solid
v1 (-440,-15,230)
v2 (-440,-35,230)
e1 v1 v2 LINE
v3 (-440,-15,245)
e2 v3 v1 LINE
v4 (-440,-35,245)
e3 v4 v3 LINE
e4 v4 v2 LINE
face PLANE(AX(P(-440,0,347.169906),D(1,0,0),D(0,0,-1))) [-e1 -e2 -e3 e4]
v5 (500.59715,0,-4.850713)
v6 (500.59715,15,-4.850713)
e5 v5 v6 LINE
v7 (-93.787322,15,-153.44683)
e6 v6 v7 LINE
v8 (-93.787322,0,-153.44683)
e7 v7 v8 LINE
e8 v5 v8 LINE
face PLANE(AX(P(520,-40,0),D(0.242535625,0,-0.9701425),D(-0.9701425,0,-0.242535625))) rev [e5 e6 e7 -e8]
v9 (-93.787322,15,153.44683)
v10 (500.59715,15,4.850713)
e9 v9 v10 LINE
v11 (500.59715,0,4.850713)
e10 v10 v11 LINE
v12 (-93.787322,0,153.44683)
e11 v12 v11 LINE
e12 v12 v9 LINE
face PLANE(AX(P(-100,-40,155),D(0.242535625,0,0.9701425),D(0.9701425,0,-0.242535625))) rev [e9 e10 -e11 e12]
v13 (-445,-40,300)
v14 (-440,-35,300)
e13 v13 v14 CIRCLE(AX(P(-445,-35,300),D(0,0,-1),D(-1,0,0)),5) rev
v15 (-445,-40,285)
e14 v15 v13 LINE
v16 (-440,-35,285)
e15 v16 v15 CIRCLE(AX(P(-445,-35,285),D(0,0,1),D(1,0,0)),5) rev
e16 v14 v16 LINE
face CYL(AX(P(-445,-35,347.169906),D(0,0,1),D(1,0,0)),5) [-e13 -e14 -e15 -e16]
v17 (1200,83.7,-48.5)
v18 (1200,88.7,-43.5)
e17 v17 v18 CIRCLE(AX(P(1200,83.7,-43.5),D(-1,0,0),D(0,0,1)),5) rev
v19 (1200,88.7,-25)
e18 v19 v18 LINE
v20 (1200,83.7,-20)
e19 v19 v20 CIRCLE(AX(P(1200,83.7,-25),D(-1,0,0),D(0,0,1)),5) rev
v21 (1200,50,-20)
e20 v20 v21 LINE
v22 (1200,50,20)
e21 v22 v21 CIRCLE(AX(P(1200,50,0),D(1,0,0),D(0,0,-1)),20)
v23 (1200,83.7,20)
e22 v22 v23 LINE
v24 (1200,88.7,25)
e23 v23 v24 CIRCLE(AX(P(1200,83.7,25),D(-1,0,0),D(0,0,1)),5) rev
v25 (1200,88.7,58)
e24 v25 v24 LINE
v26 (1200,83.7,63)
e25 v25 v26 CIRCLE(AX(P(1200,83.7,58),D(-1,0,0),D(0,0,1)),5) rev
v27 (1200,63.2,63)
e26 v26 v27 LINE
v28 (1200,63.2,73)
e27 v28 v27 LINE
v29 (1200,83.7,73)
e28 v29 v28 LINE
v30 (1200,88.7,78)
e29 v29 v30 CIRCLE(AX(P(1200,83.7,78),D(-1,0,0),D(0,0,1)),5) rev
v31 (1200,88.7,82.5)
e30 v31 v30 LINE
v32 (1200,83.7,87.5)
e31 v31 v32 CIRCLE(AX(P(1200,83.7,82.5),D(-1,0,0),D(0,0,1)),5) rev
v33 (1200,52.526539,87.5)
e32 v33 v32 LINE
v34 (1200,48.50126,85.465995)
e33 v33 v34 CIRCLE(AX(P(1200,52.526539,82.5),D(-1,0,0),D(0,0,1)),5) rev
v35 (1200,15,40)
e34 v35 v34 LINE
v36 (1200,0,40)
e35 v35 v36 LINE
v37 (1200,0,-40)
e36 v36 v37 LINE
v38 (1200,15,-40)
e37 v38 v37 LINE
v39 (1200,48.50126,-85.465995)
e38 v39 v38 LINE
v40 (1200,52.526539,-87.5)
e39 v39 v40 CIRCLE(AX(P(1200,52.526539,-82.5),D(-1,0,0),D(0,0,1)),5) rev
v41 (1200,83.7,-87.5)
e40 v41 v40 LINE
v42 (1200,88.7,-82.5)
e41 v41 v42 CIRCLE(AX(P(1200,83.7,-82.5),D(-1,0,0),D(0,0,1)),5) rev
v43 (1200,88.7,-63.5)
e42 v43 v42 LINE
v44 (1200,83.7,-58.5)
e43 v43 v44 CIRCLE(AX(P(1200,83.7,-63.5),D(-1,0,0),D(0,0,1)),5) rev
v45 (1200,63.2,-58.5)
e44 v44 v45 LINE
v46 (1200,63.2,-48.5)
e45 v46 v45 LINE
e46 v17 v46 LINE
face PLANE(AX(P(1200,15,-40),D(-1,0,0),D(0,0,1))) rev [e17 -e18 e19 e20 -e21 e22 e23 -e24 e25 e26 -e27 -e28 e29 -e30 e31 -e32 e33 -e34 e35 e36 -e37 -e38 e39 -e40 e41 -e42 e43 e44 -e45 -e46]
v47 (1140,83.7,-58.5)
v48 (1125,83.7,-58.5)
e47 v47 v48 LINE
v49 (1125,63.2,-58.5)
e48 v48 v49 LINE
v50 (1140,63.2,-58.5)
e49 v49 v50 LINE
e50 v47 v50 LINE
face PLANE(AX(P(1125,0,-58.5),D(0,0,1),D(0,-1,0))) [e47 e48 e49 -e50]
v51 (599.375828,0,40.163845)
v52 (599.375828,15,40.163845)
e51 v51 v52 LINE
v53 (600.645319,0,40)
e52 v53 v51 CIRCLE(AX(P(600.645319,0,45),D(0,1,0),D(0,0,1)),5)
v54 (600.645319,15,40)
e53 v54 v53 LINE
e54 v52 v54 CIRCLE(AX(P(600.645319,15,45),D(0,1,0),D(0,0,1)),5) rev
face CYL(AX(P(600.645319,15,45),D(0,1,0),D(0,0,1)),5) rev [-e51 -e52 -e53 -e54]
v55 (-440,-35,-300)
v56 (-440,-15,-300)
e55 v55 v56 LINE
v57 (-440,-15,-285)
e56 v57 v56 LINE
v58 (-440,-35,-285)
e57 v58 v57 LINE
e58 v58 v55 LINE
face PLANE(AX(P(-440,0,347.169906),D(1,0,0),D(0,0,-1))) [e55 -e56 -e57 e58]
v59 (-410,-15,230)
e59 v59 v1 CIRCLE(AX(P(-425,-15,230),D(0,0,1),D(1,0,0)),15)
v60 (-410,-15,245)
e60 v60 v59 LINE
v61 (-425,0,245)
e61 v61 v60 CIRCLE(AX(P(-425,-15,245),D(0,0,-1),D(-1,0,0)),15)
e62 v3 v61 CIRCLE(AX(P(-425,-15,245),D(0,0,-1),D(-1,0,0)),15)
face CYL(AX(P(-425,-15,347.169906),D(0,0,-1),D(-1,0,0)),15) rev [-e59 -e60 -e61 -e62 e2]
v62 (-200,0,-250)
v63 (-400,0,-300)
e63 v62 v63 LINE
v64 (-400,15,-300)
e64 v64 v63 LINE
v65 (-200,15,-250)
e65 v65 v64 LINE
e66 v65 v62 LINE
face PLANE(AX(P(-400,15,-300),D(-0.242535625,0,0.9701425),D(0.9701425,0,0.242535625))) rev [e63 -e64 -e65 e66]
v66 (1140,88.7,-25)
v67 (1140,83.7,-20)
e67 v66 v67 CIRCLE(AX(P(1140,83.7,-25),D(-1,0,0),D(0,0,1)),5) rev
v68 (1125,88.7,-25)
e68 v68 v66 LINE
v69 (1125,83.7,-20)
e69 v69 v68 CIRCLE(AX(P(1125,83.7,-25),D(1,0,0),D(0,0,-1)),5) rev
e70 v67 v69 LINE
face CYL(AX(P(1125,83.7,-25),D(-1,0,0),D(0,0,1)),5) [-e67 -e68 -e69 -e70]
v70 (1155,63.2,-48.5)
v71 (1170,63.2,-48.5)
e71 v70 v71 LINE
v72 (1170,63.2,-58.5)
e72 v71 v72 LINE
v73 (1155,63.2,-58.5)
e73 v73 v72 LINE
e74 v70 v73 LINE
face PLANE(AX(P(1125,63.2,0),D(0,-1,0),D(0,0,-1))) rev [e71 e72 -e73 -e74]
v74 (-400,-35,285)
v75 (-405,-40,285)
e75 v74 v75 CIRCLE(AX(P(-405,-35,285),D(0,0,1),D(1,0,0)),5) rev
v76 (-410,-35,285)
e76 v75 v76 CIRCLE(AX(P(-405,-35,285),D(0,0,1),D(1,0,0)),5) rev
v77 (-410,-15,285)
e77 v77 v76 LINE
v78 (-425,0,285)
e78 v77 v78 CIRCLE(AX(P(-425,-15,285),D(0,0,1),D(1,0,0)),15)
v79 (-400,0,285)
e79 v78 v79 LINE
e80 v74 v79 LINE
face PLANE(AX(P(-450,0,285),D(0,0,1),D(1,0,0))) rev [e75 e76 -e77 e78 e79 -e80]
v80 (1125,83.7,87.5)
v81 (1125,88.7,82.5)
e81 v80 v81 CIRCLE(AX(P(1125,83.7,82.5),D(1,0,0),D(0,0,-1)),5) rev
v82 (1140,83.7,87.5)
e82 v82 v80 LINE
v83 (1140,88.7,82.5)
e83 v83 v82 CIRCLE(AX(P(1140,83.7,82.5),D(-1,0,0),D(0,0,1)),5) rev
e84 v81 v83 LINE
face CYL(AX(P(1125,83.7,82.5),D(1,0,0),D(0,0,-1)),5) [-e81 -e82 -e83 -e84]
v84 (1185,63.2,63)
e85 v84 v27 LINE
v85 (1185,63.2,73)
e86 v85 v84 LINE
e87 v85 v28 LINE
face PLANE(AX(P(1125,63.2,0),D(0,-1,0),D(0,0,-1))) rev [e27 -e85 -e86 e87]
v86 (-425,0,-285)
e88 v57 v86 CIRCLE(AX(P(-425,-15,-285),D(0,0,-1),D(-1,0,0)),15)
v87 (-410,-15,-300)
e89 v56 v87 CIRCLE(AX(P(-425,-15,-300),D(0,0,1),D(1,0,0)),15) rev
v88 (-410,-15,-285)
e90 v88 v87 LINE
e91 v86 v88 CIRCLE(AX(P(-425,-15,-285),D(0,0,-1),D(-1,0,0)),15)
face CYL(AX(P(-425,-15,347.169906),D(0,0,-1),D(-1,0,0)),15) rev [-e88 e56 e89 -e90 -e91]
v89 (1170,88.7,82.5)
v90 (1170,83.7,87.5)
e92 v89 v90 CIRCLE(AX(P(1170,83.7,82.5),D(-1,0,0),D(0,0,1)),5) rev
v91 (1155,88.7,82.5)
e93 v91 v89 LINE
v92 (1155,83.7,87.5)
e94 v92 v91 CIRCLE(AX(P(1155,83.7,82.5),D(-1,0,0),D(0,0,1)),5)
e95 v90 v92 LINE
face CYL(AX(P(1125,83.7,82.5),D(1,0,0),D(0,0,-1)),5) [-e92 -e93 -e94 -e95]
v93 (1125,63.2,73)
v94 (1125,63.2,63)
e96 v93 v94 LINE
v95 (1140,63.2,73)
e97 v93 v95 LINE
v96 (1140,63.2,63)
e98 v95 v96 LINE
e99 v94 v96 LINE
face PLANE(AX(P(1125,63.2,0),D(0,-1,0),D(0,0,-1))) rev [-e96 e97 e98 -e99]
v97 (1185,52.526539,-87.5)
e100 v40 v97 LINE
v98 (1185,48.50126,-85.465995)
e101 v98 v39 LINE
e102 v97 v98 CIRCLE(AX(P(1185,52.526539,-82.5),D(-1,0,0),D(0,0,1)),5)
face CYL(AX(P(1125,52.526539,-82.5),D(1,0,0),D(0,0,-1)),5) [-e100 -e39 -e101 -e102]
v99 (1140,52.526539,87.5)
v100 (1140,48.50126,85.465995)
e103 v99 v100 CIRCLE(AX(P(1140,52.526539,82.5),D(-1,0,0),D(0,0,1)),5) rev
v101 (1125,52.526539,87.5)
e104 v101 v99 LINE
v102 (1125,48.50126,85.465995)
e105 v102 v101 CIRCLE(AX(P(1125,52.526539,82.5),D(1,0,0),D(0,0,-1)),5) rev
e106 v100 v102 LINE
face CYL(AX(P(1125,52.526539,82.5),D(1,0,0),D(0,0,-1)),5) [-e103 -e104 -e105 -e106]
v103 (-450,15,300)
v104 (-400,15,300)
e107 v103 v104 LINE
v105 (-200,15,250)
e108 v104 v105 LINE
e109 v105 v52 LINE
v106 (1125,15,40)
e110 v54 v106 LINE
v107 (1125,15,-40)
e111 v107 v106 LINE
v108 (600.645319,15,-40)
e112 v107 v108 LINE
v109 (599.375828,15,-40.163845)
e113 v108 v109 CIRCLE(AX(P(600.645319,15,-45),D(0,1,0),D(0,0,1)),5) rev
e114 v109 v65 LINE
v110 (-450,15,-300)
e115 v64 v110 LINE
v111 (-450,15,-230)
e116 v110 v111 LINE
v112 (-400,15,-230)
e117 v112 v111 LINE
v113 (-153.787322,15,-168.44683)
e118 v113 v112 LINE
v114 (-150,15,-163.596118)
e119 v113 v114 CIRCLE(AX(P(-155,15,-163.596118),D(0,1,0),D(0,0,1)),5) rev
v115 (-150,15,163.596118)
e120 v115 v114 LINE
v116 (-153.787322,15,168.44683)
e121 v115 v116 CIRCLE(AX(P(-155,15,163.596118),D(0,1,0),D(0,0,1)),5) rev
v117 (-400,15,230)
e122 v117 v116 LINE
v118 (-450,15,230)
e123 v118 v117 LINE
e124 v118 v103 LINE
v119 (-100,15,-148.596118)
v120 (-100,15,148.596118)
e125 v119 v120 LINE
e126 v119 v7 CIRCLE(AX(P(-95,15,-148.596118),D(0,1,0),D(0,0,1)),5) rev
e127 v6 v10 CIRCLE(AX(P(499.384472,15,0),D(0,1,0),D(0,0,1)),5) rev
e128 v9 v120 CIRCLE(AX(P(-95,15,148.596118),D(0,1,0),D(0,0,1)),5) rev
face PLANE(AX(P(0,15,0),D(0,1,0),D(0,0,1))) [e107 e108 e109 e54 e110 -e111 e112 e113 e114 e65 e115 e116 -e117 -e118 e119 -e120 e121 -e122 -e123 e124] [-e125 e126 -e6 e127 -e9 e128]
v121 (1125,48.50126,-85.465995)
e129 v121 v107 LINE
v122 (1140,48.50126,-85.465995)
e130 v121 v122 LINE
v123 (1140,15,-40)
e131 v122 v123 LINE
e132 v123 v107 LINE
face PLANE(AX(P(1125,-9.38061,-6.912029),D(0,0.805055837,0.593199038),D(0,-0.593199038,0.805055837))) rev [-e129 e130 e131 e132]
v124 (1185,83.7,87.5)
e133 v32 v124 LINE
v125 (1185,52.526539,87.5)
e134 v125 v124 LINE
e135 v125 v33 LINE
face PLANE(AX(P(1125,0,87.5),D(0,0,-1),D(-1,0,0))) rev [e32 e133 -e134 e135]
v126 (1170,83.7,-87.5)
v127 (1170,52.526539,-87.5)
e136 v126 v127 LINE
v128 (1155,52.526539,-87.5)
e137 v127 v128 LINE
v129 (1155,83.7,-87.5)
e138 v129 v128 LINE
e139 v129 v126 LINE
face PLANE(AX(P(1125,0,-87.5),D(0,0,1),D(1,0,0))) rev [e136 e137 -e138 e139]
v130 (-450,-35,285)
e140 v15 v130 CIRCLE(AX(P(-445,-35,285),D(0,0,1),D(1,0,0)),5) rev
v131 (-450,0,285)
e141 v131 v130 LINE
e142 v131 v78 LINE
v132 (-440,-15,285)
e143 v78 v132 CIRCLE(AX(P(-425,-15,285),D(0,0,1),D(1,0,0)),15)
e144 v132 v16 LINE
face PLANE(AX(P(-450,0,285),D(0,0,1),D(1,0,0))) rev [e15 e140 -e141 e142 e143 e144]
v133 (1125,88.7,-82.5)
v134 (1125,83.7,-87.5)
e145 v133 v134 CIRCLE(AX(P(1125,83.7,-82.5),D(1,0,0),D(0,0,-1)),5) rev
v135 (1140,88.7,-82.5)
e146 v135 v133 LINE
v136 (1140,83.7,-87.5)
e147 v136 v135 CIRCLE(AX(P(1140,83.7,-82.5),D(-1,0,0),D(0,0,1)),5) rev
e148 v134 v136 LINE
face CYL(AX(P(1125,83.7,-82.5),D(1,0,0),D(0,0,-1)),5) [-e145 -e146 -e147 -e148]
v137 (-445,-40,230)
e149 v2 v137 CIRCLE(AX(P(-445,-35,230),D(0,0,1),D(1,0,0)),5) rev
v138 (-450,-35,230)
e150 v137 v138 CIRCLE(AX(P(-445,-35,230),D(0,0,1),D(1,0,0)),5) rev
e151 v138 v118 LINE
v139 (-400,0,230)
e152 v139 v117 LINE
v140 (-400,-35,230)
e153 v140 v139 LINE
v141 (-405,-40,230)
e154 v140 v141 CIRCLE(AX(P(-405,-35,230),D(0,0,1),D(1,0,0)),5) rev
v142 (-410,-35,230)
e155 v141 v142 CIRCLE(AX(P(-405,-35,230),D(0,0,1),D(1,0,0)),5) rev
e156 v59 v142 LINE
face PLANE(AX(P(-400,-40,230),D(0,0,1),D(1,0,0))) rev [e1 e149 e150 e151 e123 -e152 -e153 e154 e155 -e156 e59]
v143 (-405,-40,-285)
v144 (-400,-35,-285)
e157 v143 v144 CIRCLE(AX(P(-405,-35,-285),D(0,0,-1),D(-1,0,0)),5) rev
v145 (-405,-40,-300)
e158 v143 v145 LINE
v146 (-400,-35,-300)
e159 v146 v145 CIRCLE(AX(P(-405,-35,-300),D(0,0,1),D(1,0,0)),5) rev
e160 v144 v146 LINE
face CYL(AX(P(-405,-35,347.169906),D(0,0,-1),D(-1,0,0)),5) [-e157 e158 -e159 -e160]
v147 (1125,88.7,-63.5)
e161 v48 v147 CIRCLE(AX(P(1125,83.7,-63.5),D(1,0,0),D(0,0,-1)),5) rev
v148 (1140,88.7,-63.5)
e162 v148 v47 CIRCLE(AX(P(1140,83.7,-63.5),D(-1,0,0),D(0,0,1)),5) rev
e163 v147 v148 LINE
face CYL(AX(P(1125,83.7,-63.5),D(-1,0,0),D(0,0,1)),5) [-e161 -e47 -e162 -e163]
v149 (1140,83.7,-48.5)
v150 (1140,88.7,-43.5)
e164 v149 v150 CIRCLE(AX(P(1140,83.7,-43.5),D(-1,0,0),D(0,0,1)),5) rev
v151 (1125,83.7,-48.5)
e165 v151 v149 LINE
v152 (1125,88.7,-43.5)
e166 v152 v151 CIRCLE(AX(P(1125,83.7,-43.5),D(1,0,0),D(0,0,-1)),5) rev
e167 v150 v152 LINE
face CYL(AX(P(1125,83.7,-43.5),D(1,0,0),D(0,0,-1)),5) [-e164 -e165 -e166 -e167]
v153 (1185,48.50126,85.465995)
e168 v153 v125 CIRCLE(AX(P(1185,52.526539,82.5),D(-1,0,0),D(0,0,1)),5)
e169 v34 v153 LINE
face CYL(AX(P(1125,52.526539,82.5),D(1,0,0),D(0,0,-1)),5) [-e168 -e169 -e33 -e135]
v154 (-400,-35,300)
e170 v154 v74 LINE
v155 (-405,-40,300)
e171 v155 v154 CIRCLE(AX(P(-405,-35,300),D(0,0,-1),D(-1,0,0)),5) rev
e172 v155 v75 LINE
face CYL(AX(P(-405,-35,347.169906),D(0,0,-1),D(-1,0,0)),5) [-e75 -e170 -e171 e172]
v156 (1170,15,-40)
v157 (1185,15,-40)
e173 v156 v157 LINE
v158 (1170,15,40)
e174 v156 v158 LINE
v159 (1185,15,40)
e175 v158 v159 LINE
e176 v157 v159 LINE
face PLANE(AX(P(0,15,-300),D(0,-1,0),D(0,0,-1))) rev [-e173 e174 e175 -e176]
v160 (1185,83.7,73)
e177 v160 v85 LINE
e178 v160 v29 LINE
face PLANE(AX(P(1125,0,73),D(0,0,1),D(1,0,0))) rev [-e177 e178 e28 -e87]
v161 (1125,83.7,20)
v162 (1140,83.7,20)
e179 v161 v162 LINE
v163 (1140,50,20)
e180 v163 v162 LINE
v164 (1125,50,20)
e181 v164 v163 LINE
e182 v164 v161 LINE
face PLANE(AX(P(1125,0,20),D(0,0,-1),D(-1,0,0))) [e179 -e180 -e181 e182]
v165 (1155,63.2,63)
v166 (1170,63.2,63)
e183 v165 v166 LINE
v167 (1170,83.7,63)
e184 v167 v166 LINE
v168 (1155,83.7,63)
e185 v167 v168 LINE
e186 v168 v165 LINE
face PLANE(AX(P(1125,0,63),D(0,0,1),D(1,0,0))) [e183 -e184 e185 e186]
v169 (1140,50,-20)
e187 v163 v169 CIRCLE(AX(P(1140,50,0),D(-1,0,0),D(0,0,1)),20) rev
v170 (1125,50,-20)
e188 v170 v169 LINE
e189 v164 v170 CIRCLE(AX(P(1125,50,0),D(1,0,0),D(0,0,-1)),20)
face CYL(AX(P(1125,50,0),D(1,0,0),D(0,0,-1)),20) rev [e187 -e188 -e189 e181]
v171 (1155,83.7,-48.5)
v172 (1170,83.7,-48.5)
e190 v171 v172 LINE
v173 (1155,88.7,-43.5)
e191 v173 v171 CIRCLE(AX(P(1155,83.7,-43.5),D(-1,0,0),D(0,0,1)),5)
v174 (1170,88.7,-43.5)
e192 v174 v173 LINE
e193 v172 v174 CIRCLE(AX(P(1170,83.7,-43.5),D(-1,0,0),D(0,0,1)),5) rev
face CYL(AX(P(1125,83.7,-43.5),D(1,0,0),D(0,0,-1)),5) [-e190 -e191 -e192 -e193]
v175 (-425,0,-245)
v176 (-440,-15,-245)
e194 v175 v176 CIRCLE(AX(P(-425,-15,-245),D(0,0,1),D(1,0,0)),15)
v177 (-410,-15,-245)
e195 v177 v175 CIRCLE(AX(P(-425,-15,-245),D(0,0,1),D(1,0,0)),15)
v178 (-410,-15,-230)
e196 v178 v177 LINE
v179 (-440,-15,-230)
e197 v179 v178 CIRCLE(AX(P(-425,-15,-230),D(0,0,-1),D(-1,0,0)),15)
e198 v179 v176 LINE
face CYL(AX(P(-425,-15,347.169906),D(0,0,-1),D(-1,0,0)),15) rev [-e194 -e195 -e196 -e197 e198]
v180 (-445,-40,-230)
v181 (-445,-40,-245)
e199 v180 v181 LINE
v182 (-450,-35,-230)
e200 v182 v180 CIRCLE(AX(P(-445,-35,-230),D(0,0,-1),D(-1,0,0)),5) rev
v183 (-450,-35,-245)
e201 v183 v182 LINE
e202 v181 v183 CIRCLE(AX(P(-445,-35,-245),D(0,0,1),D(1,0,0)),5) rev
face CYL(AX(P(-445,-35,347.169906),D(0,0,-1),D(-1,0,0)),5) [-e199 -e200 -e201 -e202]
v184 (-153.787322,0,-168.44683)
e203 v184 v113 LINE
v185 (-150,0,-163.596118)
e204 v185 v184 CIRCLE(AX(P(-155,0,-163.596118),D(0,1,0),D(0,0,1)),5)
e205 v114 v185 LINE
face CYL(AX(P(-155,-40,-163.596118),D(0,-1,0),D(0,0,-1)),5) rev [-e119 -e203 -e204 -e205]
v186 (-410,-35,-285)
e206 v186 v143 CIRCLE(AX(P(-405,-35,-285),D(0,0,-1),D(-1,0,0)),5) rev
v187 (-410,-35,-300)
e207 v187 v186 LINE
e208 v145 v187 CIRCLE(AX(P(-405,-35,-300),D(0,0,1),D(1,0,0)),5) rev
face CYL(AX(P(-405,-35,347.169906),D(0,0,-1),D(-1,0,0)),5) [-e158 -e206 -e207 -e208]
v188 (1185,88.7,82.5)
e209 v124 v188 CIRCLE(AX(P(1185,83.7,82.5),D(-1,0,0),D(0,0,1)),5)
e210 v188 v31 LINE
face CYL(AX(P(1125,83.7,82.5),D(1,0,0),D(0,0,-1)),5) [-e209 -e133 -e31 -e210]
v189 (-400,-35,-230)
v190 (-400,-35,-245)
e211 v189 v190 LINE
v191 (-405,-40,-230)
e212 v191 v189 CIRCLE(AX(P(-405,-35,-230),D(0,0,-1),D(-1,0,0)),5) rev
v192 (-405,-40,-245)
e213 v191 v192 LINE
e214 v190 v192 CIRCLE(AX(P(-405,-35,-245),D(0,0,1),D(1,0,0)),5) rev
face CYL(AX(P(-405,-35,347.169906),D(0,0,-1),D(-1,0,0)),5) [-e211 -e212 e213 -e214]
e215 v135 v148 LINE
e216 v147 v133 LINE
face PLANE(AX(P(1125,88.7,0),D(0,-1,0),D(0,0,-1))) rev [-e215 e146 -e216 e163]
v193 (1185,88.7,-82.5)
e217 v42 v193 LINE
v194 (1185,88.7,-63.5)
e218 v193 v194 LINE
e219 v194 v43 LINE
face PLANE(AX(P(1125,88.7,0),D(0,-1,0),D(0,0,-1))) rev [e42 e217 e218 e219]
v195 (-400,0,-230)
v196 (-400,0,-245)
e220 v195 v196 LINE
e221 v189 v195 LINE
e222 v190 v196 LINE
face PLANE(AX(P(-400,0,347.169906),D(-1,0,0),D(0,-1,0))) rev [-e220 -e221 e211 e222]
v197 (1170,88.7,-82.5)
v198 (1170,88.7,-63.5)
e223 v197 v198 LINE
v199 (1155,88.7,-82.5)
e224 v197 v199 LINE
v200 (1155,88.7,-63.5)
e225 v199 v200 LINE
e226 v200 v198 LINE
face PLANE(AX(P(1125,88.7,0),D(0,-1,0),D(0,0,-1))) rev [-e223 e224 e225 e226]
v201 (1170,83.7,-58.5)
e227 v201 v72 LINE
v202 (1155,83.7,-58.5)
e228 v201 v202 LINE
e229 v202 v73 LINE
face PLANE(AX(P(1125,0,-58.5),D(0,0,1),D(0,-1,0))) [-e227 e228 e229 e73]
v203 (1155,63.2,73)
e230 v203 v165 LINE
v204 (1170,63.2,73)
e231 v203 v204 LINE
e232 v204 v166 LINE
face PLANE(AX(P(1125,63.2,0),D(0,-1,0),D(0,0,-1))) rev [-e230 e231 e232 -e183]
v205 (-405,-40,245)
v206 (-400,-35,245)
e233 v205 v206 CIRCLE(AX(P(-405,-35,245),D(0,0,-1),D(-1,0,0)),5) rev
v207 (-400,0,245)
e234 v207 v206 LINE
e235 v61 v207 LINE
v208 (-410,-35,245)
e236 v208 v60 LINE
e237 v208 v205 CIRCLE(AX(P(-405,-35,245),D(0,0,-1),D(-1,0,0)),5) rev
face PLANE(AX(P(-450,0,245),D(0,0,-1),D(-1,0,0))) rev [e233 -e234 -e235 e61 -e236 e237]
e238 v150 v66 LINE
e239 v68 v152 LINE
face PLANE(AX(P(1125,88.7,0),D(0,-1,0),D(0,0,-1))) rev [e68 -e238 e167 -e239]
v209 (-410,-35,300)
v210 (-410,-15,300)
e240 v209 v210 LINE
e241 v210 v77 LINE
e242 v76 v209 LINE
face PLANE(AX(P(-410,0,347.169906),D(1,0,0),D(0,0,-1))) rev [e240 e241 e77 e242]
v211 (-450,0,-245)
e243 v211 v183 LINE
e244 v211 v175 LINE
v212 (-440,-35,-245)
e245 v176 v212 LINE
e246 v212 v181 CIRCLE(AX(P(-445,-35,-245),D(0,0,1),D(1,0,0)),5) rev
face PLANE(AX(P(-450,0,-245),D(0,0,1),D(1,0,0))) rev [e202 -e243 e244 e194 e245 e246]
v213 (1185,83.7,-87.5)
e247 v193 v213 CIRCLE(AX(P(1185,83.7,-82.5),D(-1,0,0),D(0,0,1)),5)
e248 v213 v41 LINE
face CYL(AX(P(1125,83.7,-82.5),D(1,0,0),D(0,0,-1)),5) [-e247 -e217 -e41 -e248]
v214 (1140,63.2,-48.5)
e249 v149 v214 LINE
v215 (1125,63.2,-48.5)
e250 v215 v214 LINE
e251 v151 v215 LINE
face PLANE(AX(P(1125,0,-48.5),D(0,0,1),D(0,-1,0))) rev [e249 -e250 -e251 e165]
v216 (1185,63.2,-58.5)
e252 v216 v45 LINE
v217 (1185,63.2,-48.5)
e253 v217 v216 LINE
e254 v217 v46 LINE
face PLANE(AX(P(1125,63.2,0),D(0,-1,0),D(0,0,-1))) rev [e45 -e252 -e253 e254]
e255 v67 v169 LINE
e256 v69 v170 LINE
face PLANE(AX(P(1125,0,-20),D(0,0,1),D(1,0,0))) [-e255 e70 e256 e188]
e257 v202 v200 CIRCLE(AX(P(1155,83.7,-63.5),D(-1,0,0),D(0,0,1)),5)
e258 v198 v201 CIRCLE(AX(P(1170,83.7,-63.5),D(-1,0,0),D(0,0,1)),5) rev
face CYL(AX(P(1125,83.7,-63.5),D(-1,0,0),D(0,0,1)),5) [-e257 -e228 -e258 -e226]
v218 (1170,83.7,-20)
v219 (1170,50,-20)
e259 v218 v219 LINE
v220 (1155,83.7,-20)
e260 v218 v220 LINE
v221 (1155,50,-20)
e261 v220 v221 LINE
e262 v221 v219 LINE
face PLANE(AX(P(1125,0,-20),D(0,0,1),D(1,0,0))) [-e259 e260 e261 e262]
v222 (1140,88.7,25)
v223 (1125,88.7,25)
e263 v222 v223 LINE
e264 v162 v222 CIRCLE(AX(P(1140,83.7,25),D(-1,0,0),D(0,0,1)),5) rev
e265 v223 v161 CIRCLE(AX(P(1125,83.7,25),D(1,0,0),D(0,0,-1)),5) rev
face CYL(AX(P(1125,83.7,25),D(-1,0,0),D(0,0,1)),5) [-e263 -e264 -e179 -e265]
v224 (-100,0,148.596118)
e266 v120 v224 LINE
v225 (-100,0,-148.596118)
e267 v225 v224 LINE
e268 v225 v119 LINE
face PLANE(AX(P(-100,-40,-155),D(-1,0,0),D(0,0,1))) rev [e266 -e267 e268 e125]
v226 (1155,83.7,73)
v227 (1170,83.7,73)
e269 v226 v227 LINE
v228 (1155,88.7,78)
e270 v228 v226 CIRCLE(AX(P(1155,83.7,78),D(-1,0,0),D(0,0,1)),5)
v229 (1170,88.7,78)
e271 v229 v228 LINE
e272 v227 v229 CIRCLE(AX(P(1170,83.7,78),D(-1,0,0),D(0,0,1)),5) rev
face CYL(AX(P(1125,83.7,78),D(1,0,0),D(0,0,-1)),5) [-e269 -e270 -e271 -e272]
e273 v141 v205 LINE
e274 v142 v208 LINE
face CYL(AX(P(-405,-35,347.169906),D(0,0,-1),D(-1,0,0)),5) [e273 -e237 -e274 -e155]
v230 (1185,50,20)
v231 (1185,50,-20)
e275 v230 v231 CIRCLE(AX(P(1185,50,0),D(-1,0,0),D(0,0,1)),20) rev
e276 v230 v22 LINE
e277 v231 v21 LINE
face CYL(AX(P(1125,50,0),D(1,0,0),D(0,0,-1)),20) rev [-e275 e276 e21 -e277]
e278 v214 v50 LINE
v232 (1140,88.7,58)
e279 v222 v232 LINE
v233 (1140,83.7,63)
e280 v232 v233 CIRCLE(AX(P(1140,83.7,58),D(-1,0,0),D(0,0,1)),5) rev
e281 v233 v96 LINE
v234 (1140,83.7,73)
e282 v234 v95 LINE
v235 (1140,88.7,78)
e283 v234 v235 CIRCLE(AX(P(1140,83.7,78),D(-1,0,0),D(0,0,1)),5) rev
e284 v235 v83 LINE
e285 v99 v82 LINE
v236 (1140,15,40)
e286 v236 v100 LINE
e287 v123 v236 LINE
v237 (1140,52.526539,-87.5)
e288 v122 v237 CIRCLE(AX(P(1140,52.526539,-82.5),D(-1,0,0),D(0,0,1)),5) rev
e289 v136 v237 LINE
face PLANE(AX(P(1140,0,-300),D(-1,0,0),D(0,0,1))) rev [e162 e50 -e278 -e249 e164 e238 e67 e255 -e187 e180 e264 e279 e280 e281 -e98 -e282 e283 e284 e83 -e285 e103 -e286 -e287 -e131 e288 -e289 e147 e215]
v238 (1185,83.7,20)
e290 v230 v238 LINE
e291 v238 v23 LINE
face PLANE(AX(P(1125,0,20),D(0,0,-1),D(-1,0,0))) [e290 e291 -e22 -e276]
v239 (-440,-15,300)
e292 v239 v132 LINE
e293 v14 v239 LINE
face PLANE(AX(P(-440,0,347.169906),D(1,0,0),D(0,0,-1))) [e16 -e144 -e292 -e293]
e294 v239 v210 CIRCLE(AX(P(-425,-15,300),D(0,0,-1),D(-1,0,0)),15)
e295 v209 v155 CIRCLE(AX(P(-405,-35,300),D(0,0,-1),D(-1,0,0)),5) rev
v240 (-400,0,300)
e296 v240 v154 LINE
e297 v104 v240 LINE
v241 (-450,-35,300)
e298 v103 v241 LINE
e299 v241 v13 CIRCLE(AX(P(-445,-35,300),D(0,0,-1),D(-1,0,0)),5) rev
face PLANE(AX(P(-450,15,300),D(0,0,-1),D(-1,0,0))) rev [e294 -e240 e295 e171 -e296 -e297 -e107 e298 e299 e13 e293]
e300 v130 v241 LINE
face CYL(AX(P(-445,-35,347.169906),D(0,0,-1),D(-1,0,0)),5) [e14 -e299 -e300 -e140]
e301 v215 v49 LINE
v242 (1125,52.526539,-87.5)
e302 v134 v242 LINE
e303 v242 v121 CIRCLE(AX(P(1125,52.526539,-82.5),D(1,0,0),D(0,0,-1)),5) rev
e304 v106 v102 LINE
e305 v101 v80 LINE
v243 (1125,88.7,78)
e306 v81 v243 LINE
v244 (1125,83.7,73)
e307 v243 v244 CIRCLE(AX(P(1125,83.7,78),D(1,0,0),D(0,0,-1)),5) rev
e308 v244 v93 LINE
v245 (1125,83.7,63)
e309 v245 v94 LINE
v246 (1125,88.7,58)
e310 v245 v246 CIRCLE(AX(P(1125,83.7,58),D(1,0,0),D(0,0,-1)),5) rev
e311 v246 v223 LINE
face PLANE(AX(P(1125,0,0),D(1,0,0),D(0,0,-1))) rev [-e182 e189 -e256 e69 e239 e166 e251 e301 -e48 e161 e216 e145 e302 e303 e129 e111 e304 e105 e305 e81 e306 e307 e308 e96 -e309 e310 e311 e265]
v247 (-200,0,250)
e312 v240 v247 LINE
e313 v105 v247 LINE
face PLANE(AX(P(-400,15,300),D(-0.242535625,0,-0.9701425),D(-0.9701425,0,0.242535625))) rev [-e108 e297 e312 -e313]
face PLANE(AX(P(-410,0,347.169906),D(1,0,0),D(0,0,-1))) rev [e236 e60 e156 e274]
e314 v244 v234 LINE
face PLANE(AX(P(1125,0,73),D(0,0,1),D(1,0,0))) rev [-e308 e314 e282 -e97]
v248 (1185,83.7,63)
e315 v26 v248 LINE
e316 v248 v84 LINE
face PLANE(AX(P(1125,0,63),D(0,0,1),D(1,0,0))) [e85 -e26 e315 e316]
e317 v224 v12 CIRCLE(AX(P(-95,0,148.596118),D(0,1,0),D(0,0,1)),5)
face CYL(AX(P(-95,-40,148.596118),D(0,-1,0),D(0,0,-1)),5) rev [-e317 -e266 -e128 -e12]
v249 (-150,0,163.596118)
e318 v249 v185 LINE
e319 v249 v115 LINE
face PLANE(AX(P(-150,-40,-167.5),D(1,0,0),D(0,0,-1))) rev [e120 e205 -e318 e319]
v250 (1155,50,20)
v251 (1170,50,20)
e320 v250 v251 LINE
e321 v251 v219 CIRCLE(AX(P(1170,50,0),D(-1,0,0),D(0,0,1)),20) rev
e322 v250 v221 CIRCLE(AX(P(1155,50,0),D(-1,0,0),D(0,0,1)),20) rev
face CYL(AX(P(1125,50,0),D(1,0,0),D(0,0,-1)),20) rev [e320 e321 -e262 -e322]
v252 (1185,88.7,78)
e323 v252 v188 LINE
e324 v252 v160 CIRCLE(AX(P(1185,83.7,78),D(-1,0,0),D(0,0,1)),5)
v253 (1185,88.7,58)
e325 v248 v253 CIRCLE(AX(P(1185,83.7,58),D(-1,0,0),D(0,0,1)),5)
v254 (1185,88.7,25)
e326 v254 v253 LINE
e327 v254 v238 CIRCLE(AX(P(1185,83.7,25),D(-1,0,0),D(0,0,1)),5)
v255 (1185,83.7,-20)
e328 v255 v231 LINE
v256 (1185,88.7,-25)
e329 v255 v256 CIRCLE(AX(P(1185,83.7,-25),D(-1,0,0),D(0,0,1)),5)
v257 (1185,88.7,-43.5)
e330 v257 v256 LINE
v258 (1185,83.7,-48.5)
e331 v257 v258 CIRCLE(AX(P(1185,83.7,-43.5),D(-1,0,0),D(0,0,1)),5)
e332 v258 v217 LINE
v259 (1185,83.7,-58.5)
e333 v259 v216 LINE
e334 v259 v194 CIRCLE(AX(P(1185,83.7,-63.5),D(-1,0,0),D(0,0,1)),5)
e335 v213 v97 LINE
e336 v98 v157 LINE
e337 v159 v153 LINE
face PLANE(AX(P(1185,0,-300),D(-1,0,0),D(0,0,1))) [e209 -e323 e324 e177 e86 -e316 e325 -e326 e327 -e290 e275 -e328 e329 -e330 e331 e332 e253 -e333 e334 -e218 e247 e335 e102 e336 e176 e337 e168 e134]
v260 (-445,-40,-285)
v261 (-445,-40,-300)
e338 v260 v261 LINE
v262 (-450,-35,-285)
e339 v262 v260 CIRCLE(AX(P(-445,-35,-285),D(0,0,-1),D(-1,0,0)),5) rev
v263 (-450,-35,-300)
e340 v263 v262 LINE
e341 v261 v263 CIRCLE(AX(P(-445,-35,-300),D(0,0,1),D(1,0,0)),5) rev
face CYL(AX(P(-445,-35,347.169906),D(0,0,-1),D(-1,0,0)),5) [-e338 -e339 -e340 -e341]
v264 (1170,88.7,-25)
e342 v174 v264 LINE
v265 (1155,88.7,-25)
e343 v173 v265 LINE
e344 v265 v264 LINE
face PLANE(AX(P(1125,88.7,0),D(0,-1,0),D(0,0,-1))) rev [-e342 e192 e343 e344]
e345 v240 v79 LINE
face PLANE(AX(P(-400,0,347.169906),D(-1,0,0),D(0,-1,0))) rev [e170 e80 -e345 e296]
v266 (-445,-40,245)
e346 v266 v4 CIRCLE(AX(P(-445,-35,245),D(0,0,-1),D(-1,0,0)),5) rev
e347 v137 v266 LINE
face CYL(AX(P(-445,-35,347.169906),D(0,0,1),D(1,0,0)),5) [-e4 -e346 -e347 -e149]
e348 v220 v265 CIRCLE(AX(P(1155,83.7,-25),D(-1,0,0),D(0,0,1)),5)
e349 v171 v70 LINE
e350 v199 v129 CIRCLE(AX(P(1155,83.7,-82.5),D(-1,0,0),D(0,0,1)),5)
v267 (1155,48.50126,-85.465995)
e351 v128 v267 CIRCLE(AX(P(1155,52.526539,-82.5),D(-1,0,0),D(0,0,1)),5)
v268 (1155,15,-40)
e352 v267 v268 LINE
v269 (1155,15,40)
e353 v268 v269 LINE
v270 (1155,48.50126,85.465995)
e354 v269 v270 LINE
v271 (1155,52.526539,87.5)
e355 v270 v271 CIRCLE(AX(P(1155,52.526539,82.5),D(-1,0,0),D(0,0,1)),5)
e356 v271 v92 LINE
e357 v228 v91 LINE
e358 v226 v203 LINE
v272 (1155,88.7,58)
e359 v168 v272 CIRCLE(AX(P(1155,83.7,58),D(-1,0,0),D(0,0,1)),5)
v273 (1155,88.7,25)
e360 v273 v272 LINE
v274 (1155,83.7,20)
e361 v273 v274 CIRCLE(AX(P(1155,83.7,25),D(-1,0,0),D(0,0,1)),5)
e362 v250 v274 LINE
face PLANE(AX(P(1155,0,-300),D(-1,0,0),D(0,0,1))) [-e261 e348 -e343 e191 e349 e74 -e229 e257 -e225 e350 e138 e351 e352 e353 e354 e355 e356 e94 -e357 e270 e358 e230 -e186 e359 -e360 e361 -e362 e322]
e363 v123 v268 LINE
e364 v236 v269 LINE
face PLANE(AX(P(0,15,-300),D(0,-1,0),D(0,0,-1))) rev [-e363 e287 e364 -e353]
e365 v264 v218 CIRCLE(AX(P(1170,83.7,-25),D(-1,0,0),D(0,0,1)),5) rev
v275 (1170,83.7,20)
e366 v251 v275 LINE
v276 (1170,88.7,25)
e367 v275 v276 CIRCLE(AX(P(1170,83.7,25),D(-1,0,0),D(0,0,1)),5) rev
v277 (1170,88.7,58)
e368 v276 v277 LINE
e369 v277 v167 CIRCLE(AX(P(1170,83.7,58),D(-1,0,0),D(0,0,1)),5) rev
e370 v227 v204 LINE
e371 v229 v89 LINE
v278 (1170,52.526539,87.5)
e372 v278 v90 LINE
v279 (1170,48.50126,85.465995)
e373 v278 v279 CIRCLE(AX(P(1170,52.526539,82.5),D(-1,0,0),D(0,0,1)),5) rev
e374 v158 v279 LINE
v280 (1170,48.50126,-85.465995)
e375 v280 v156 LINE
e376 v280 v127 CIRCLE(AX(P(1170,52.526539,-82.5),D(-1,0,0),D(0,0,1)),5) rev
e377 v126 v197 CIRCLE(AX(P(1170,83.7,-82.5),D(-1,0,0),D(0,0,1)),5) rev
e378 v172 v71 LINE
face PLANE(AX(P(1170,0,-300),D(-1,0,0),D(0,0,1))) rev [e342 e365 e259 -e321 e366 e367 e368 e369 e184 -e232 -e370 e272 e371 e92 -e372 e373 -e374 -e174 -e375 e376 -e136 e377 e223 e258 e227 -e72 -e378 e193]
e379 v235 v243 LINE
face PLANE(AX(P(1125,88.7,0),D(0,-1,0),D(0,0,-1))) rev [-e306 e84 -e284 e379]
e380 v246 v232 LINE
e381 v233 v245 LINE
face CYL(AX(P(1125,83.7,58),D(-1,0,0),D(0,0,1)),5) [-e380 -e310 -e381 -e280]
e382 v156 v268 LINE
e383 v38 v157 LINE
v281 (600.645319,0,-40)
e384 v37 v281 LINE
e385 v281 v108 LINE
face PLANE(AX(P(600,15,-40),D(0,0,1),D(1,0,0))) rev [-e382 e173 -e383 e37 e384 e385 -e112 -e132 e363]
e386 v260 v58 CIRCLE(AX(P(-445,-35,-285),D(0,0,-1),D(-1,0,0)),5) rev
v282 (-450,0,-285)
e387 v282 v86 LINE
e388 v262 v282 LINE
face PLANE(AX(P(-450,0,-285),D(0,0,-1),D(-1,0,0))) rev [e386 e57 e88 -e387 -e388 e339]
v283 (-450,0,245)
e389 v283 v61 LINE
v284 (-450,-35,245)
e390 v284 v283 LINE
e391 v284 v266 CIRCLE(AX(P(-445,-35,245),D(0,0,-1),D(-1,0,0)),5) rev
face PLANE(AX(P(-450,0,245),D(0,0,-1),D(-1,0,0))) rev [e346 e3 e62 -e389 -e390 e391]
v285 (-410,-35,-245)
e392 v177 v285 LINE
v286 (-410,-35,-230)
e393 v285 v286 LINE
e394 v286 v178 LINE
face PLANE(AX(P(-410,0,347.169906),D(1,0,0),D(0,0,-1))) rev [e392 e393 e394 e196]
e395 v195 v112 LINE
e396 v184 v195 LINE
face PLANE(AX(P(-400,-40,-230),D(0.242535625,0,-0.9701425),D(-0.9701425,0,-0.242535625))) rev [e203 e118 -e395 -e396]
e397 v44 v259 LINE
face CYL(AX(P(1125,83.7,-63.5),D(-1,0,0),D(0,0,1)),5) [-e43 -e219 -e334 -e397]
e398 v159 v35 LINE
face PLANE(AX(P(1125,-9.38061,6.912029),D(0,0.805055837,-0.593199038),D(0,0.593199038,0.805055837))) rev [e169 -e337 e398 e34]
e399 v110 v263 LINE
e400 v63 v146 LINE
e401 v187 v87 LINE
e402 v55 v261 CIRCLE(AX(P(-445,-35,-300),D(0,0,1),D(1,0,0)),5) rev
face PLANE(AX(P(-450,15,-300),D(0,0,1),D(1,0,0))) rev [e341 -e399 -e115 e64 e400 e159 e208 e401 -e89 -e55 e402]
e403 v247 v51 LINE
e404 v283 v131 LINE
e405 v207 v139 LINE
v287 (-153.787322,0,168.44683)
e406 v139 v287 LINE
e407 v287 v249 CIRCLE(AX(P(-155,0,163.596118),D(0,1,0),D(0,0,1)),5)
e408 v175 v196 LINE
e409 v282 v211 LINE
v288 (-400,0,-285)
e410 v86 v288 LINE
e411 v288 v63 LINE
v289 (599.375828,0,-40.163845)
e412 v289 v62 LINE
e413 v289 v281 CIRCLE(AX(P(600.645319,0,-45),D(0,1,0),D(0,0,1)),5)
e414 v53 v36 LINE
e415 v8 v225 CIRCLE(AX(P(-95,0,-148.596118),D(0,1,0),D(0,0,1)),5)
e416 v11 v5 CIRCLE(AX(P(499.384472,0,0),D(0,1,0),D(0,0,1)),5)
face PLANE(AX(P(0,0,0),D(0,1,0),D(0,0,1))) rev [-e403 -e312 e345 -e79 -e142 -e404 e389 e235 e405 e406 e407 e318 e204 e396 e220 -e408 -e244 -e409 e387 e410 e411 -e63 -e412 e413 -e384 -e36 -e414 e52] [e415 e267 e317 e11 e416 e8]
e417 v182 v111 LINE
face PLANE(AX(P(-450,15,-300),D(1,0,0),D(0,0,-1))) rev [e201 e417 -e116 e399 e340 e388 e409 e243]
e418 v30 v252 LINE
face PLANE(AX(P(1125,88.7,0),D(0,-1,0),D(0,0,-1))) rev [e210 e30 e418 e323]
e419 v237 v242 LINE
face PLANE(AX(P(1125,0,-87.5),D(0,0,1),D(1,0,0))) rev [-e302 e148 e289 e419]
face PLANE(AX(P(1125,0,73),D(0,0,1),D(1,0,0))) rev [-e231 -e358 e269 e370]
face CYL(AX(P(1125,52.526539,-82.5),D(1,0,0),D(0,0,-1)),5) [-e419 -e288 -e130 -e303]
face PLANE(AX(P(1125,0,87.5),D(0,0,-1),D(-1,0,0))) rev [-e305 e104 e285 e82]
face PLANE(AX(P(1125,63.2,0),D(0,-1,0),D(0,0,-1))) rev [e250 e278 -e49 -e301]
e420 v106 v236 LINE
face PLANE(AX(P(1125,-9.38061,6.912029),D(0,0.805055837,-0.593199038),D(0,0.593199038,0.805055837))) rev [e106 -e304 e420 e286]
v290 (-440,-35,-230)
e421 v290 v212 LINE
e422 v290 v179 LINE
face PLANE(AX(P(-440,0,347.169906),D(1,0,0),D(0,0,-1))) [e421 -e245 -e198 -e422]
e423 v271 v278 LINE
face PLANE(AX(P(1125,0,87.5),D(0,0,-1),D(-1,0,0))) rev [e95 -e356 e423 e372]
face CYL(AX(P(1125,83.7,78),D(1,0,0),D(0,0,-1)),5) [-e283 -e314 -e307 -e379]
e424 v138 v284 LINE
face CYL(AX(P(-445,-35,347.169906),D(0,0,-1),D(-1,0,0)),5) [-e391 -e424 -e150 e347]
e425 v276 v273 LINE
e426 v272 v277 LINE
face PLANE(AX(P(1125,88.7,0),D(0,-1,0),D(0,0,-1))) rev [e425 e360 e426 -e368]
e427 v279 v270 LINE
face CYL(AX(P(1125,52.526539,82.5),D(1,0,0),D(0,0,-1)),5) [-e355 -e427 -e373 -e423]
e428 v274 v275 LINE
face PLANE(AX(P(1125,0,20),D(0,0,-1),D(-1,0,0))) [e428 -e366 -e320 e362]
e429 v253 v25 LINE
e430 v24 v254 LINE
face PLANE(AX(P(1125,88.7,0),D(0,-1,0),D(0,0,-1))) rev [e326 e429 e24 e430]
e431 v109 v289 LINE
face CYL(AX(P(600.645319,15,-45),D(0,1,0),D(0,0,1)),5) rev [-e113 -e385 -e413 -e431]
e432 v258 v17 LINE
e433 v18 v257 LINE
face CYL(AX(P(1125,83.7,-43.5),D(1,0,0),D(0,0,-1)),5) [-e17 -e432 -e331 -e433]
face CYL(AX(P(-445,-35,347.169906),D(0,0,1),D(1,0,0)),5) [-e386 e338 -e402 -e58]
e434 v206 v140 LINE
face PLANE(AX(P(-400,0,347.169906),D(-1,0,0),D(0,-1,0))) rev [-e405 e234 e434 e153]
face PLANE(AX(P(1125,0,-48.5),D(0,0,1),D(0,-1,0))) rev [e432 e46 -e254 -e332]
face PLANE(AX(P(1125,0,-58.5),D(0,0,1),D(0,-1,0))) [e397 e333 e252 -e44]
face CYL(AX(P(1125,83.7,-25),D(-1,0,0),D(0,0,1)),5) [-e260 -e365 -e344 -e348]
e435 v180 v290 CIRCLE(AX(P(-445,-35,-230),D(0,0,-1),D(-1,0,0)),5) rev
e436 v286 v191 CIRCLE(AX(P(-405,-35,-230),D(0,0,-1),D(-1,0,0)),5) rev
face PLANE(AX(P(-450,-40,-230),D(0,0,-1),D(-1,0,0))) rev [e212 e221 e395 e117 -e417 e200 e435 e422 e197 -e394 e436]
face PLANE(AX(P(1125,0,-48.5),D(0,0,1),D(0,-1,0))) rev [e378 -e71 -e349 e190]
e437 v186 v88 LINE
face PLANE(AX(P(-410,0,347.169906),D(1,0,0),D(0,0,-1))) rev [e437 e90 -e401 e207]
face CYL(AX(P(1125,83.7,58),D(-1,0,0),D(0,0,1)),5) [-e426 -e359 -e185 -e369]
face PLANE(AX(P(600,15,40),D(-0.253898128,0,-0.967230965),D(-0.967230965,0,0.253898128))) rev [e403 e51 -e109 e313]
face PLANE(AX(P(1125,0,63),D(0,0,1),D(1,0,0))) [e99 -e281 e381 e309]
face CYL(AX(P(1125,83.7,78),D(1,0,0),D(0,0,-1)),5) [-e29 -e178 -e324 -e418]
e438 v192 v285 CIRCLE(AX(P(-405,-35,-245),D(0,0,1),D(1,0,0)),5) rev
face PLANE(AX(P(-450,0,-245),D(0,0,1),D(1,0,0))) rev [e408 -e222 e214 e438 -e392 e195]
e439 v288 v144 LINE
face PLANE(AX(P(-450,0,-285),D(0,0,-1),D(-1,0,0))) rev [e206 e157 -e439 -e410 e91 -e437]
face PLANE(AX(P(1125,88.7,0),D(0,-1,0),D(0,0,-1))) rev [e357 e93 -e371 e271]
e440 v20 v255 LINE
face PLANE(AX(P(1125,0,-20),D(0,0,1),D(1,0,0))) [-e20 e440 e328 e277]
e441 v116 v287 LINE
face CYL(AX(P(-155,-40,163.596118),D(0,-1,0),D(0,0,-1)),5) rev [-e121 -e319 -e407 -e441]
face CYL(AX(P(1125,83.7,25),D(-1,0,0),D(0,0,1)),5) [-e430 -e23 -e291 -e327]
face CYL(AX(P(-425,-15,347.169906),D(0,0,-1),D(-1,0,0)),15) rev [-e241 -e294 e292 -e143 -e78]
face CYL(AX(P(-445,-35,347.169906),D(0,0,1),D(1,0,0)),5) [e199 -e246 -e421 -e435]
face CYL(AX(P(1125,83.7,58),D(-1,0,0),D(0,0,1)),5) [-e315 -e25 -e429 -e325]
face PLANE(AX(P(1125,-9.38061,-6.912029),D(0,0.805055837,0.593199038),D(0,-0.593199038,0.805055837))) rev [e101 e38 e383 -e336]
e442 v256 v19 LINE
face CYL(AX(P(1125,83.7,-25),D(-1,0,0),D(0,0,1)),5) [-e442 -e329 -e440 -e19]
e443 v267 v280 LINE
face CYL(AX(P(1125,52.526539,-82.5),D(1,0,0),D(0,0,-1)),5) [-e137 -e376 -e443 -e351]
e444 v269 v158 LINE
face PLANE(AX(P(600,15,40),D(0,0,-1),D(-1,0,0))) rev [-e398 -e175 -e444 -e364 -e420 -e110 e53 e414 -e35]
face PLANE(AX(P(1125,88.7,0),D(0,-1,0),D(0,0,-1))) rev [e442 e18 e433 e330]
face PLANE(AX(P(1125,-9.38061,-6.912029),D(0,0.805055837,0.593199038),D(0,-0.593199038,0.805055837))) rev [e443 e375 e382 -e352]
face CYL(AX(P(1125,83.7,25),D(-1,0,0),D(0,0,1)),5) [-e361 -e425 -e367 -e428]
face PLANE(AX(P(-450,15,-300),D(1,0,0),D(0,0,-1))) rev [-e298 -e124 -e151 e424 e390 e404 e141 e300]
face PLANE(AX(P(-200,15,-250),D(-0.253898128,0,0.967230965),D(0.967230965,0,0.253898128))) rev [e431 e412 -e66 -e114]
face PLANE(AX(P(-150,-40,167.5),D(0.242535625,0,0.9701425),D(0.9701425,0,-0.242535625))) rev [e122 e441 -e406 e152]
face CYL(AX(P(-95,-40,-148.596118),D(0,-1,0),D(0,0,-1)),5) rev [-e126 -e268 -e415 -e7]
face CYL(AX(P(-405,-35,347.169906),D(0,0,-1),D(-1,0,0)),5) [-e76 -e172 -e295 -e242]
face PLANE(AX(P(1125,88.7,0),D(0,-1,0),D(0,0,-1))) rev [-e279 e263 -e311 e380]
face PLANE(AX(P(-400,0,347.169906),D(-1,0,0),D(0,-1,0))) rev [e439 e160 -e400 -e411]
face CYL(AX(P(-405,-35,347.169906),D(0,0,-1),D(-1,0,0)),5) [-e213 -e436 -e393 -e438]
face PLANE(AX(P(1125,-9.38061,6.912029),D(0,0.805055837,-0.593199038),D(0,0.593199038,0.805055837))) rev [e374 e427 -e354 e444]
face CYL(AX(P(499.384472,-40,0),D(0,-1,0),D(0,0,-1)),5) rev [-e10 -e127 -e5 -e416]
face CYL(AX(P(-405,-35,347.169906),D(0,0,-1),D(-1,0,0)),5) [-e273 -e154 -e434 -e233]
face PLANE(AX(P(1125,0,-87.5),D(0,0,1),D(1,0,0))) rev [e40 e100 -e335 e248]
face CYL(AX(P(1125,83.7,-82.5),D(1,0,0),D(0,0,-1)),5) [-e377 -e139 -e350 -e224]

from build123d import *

# Parameters (mm, degrees)
BOSS_EXTRUDE1_DEPTH             = 15
BOSS_EXTRUDE2_REACH             = 1239.023
BOSS_EXTRUDE2_DIRECTION_2_REACH = 1239.023
CUT_EXTRUDE2_DEPTH              = 1238.578280352
CUT_EXTRUDE2_DEPTH_BACK         = 1238.578280352
SKETCH5_W                       = 40
SKETCH5_H                       = 40
CUT_EXTRUDE3_DEPTH              = 1238.578280352
BOSS_EXTRUDE4_DEPTH             = 75
CUT_EXTRUDE4_DEPTH              = 1241.107934819
CUT_EXTRUDE4_DEPTH_BACK         = 1241.107934819
SKETCH8_W                       = 15
SKETCH8_H                       = 73.7
FILLET1_R                       = 5


with BuildPart() as part:
    # Sketch1 → Boss-Extrude1 (new body)
    with BuildSketch(Plane(origin=(0, 0, 0), x_dir=(1, 0, 0), z_dir=(0, 1, 0))):
        Polygon((-450, 300), (-400, 300), (-200, 250), (600, 40), (1200, 40), (1200, -40), (600, -40), (-200, -250), (-400, -300), (-450, -300), align=None)
    extrude(amount=BOSS_EXTRUDE1_DEPTH)

    # Boss-Extrude2: up to this face of the body (flat: up to its plane)
    boss_extrude2_end = Plane(part.part.faces().sort_by_distance((-425, 7.5, 300))[0])
    # Sketch2 → Boss-Extrude2 (add, up to the picked face)
    with BuildSketch(Plane.XY, mode=Mode.PRIVATE) as boss_extrude2_sk1:
        with BuildLine():
            Line((-425, 0), (-450, 0))
            Line((-450, 0), (-450, -40))
            Line((-450, -40), (-440, -40))
            Line((-440, -40), (-440, -15))
            ThreePointArc((-440, -15), (-435.606601718, -4.393398282), (-425, 0))
        make_face()
    boss_extrude2_tool1 = split(extrude(boss_extrude2_sk1.sketch, amount=BOSS_EXTRUDE2_REACH, mode=Mode.PRIVATE), bisect_by=boss_extrude2_end, keep=Keep.BOTH, mode=Mode.PRIVATE)
    # Sketch2 → Boss-Extrude2 (add, up to the picked face)
    with BuildSketch(Plane.XY, mode=Mode.PRIVATE) as boss_extrude2_sk2:
        with BuildLine():
            Line((-400, 0), (-425, 0))
            ThreePointArc((-425, 0), (-414.393398282, -4.393398282), (-410, -15))
            Line((-410, -15), (-410, -40))
            Line((-410, -40), (-400, -40))
            Line((-400, -40), (-400, 0))
        make_face()
    boss_extrude2_tool2 = split(extrude(boss_extrude2_sk2.sketch, amount=BOSS_EXTRUDE2_REACH, mode=Mode.PRIVATE), bisect_by=boss_extrude2_end, keep=Keep.BOTH, mode=Mode.PRIVATE)
    add(boss_extrude2_tool1.solids().sort_by(Axis((-444.100555, -18.206662, 0), (0, 0, 1)))[0])
    add(boss_extrude2_tool2.solids().sort_by(Axis((-405.899445, -18.206662, 0), (0, 0, 1)))[0])

    # Boss-Extrude2 direction 2: up to this face of the body (flat: up to its plane)
    boss_extrude2_direction_2_end = Plane(part.part.faces().sort_by_distance((-425, 7.5, -300))[0])
    # Sketch2 → Boss-Extrude2 direction 2 (add, up to the picked face)
    with BuildSketch(Plane.XY, mode=Mode.PRIVATE) as boss_extrude2_direction_2_sk1:
        with BuildLine():
            Line((-425, 0), (-450, 0))
            Line((-450, 0), (-450, -40))
            Line((-450, -40), (-440, -40))
            Line((-440, -40), (-440, -15))
            ThreePointArc((-440, -15), (-435.606601718, -4.393398282), (-425, 0))
        make_face()
    boss_extrude2_direction_2_tool1 = split(extrude(boss_extrude2_direction_2_sk1.sketch, amount=-BOSS_EXTRUDE2_DIRECTION_2_REACH, mode=Mode.PRIVATE), bisect_by=boss_extrude2_direction_2_end, keep=Keep.BOTH, mode=Mode.PRIVATE)
    # Sketch2 → Boss-Extrude2 direction 2 (add, up to the picked face)
    with BuildSketch(Plane.XY, mode=Mode.PRIVATE) as boss_extrude2_direction_2_sk2:
        with BuildLine():
            Line((-400, 0), (-425, 0))
            ThreePointArc((-425, 0), (-414.393398282, -4.393398282), (-410, -15))
            Line((-410, -15), (-410, -40))
            Line((-410, -40), (-400, -40))
            Line((-400, -40), (-400, 0))
        make_face()
    boss_extrude2_direction_2_tool2 = split(extrude(boss_extrude2_direction_2_sk2.sketch, amount=-BOSS_EXTRUDE2_DIRECTION_2_REACH, mode=Mode.PRIVATE), bisect_by=boss_extrude2_direction_2_end, keep=Keep.BOTH, mode=Mode.PRIVATE)
    add(boss_extrude2_direction_2_tool1.solids().sort_by(Axis((-444.100555, -18.206662, 0), (0, 0, -1)))[0])
    add(boss_extrude2_direction_2_tool2.solids().sort_by(Axis((-405.899445, -18.206662, 0), (0, 0, -1)))[0])

    # Sketch4 → Cut-Extrude2 (cut, two sides: drawn at the far end of the back side and taken through both)
    with BuildSketch(Plane(origin=(0, 0, 0), x_dir=(1, 0, 0), z_dir=(0, 1, 0)).offset(-CUT_EXTRUDE2_DEPTH_BACK)):
        Polygon((-450, 230), (-400, 230), (-150, 167.5), (-150, -167.5), (-400, -230), (-450, -230), align=None)
        Polygon((-100, 155), (-100, -155), (520, 0), align=None)
    extrude(amount=CUT_EXTRUDE2_DEPTH + CUT_EXTRUDE2_DEPTH_BACK, mode=Mode.SUBTRACT)

    # Sketch5 → Cut-Extrude3 (cut, through all)
    with BuildSketch(Plane(origin=(0, 0, 0), x_dir=(0, 0, -1), z_dir=(1, 0, 0))):
        with Locations((-265, -20)):
            Rectangle(SKETCH5_W, SKETCH5_H)
        with Locations((265, -20)):
            Rectangle(SKETCH5_W, SKETCH5_H)
    extrude(amount=-CUT_EXTRUDE3_DEPTH, mode=Mode.SUBTRACT)

    # Sketch7 → Boss-Extrude4 (add)
    with BuildSketch(Plane(origin=(1200, 0, 0), x_dir=(0, 0, -1), z_dir=(1, 0, 0))):
        with BuildLine():
            Line((-87.5, 50), (-40, 15))
            Line((-40, 15), (40, 15))
            Line((40, 15), (87.5, 50))
            Line((87.5, 50), (87.5, 88.7))
            Line((87.5, 88.7), (58.5, 88.7))
            Line((58.5, 88.7), (58.5, 63.2))
            Line((58.5, 63.2), (48.5, 63.2))
            Line((48.5, 63.2), (48.5, 88.7))
            Line((48.5, 88.7), (20, 88.7))
            Line((20, 88.7), (20, 50))
            ThreePointArc((20, 50), (0, 30), (-20, 50))
            Line((-20, 50), (-20, 88.7))
            Line((-20, 88.7), (-63, 88.7))
            Line((-63, 88.7), (-63, 63.2))
            Line((-63, 63.2), (-73, 63.2))
            Line((-73, 63.2), (-73, 88.7))
            Line((-73, 88.7), (-87.5, 88.7))
            Line((-87.5, 88.7), (-87.5, 50))
        make_face()
    extrude(amount=-BOSS_EXTRUDE4_DEPTH)

    # Sketch8 → Cut-Extrude4 (cut, two sides: drawn at the far end of the back side and taken through both)
    with BuildSketch(Plane.XY.offset(-CUT_EXTRUDE4_DEPTH_BACK)):
        with Locations((1147.5, 51.85)):
            Rectangle(SKETCH8_W, SKETCH8_H)
        with Locations((1177.5, 51.85)):
            Rectangle(SKETCH8_W, SKETCH8_H)
    extrude(amount=CUT_EXTRUDE4_DEPTH + CUT_EXTRUDE4_DEPTH_BACK, mode=Mode.SUBTRACT)

    # Fillet1
    fillet1_edges = [part.edges().sort_by_distance(p)[0] for p in [
        (1192.5, 50, 87.5),
        (1162.5, 50, 87.5),
        (1132.5, 50, 87.5),
        (1192.5, 50, -87.5),
        (1162.5, 50, -87.5),
        (1132.5, 50, -87.5),
        (1192.5, 88.7, -87.5),
        (1162.5, 88.7, -87.5),
        (1132.5, 88.7, -87.5),
        (1132.5, 88.7, -58.5),
        (1162.5, 88.7, -58.5),
        (1192.5, 88.7, -58.5),
        (1192.5, 88.7, -48.5),
        (1162.5, 88.7, -48.5),
        (1132.5, 88.7, -48.5),
        (1192.5, 88.7, -20),
        (1162.5, 88.7, -20),
        (1132.5, 88.7, -20),
        (1192.5, 88.7, 63),
        (1162.5, 88.7, 63),
        (1132.5, 88.7, 63),
        (1132.5, 88.7, 87.5),
        (1162.5, 88.7, 87.5),
        (1192.5, 88.7, 87.5),
        (1192.5, 88.7, 73),
        (1162.5, 88.7, 73),
        (1132.5, 88.7, 73),
        (1192.5, 88.7, 20),
        (1162.5, 88.7, 20),
        (1132.5, 88.7, 20),
        (600, 7.5, 40),
        (600, 7.5, -40),
        (520, 7.5, 0),
        (-440, -40, -292.5),
        (-440, -40, -237.5),
        (-400, -40, -292.5),
        (-400, -40, -237.5),
        (-450, -40, -237.5),
        (-410, -40, -237.5),
        (-450, -40, -292.5),
        (-410, -40, -292.5),
        (-150, 7.5, 167.5),
        (-100, 7.5, 155),
        (-150, 7.5, -167.5),
        (-100, 7.5, -155),
        (-450, -40, 237.5),
        (-410, -40, 237.5),
        (-440, -40, 237.5),
        (-400, -40, 237.5),
        (-450, -40, 292.5),
        (-440, -40, 292.5),
        (-400, -40, 292.5),
        (-410, -40, 292.5),
    ]]
    fillet(fillet1_edges, radius=FILLET1_R - 0.0001)  # a hair under: the kernel refuses the full size


solid = part.part
